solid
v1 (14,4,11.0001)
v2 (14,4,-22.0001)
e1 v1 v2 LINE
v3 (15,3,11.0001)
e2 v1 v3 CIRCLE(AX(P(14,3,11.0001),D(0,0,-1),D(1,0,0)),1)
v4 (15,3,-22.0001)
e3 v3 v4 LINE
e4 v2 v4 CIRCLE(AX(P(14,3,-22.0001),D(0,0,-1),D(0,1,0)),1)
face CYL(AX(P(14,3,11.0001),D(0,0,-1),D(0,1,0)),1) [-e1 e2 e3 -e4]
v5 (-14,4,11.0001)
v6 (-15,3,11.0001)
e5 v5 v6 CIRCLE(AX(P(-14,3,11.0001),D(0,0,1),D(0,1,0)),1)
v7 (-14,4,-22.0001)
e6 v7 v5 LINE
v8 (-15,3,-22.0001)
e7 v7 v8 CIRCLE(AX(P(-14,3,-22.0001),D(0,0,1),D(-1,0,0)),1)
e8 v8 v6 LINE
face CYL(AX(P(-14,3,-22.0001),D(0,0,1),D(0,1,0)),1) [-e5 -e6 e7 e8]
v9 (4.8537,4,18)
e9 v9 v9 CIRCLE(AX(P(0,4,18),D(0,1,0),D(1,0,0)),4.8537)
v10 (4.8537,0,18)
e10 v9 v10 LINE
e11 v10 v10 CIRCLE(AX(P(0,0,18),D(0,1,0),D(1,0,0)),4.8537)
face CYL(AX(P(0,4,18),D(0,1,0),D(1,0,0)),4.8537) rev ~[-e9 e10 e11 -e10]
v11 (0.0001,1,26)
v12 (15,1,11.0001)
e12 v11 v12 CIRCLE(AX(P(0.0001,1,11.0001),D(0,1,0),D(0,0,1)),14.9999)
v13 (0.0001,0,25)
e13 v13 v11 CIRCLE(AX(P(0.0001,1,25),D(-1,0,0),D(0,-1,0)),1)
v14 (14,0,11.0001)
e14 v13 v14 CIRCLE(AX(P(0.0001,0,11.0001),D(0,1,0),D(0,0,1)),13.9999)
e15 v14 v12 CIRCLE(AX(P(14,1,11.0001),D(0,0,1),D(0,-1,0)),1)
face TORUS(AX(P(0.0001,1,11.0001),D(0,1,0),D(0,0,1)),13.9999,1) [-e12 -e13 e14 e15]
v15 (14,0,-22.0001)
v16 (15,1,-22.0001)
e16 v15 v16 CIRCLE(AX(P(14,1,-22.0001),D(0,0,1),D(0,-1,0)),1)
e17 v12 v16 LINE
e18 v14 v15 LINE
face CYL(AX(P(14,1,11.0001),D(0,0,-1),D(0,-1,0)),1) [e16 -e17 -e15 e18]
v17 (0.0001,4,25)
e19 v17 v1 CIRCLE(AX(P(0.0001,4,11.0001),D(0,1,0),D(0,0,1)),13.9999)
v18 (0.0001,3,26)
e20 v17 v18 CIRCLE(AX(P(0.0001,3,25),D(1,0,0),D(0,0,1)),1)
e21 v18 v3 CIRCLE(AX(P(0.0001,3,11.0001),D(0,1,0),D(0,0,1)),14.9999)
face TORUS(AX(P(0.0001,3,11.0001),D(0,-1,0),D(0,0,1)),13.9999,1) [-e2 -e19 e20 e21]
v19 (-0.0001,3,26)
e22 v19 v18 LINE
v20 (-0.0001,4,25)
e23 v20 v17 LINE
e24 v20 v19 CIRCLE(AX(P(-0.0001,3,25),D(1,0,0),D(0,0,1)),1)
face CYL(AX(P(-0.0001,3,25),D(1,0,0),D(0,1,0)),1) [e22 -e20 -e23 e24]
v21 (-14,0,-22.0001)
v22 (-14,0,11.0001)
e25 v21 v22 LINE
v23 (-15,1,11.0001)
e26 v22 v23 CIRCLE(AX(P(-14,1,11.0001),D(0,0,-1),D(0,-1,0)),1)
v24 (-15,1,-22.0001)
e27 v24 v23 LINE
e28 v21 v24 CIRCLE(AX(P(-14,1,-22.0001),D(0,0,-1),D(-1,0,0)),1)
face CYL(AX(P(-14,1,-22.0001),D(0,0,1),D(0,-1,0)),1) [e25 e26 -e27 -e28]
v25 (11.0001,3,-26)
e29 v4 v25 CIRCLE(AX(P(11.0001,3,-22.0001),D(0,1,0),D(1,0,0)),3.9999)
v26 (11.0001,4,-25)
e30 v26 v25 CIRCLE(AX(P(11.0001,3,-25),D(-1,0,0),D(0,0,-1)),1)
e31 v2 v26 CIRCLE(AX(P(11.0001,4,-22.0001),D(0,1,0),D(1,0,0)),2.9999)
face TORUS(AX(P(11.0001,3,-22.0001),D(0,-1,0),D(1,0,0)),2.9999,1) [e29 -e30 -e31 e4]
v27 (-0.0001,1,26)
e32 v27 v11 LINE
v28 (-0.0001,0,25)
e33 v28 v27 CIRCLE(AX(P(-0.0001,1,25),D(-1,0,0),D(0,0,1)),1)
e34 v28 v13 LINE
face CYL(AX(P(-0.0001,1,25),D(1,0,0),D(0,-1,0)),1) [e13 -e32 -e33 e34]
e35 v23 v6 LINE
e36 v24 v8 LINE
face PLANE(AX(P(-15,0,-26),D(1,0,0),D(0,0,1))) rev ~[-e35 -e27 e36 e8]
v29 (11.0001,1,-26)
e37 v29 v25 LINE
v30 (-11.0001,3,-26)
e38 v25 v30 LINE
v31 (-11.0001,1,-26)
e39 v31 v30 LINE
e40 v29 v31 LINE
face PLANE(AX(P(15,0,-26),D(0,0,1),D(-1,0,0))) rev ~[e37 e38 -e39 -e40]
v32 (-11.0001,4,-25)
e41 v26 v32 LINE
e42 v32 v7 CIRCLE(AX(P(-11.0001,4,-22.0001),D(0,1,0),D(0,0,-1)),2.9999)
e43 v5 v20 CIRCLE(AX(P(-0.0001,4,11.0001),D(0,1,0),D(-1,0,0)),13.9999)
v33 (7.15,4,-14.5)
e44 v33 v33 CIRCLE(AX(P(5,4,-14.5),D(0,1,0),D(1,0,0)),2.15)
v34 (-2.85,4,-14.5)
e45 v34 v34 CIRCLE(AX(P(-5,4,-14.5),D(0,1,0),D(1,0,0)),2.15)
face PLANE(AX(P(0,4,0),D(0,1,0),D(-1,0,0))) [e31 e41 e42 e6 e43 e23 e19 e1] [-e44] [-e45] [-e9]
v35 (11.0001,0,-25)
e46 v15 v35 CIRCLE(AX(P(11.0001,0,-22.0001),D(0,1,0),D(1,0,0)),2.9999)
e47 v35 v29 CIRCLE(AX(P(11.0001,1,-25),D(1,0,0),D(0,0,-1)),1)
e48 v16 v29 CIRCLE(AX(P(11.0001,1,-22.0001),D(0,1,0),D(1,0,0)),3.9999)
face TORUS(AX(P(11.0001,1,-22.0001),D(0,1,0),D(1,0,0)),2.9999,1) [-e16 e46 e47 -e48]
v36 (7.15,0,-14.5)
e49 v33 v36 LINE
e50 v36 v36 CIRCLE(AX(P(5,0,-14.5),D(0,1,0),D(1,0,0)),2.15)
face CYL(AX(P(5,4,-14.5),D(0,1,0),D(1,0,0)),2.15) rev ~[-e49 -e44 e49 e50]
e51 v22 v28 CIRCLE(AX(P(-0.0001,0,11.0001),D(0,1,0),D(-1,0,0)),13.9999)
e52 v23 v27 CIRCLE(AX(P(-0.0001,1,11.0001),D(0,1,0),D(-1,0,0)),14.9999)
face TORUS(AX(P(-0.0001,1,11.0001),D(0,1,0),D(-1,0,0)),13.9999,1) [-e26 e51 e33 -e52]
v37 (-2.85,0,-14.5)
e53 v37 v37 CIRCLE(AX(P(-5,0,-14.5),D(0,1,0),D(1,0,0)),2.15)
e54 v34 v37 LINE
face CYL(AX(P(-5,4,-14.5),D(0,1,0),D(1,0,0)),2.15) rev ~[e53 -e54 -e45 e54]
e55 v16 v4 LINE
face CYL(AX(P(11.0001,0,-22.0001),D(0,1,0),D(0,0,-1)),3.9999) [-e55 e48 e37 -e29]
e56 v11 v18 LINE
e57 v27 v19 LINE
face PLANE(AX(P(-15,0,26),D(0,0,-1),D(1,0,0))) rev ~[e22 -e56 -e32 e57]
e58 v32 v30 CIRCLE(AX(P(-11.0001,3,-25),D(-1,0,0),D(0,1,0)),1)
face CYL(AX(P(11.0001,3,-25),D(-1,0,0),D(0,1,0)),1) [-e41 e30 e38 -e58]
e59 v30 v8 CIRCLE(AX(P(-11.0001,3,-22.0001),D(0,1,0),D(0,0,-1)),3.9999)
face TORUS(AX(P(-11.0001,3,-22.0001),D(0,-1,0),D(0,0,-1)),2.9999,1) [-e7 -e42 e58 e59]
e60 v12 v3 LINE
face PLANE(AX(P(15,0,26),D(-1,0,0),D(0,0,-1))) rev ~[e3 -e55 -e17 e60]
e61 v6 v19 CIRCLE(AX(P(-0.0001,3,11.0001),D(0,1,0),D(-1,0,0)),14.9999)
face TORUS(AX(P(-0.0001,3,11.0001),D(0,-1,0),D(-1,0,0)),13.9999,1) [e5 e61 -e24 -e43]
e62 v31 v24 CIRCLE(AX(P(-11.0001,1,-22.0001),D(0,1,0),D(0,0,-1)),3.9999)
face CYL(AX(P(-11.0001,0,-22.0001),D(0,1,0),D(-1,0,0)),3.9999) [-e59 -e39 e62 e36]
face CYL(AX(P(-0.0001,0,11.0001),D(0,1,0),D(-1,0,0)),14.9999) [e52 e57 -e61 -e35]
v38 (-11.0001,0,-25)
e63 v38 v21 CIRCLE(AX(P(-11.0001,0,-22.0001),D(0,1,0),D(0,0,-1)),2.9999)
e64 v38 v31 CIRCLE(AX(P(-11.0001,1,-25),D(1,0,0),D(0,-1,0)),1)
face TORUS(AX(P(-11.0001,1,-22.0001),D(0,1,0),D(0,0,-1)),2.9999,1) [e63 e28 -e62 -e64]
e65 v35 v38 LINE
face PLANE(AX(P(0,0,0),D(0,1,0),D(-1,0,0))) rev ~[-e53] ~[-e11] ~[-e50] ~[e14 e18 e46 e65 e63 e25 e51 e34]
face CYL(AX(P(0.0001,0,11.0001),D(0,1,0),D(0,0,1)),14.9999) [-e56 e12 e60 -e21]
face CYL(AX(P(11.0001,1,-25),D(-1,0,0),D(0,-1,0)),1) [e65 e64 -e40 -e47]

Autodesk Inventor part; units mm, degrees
ref_plane "YZ Plane" through (0, 0, 0) normal (1, 0, 0) x (0, 1, 0)
ref_plane "XZ Plane" through (0, 0, 0) normal (0, 1, 0) x (-1, 0, 0)
sketch "Sketch2" plane through (0, 0, 0) normal (0, 1, 0) x (-1, 0, 0)
  line L0 (15, 26) -> (-15, 26)
  line L1 (-15, 26) -> (-15, -26)
  line L2 (-15, -26) -> (15, -26)
  line L3 (15, -26) -> (15, 26)
  line L4 (0, 0) -> (0, -26) construction
  line L5 (0, 0) -> (0, 26) construction
  line L6 (0, 0) -> (15, 0) construction
  line L7 (0, 0) -> (-15, 0) construction
  dimension "d45" = 30
  dimension "d46" = 52
extrude "Main Body Sketch" add sketch "Sketch2" along normal blind 4
ref_plane "Work Plane1" through (0, 4, 0) normal (0, 1, 0) x (1, 0, 0)
sketch "Sketch4" plane through (0, 4, 0) normal (0, 1, 0) x (1, 0, 0)
  circle A0 centre (0, -18) radius 4.8537
  line L0 (15, 26) -> (-15, 26) projected
  line L1 (-15, 26) -> (-15, -26) projected
  circle A1 centre (5, 14.5) radius 2.15
  circle A2 centre (-5, 14.5) radius 2.15
  line L2 (15, -26) -> (15, 26) projected
  dimension "d84" = 44
  dimension "d85" = 30
  dimension "d86" = 15
  dimension "d87" = 4.3
  dimension "d88" = 4.3
  dimension "d89" = 10
  dimension "d90" = 10
  dimension "d91" = 11.5
  dimension "d92" = 11.5
extrude "Holes Cuts" cut sketch "Sketch4" against normal up to surface (4 mm away)
fillet "Fillet12" radius 4 2 edges at (-15, 2, -26) (15, 2, -26)
fillet "Fillet12" radius 15 2 edges at (15, 2, 26) (-15, 2, 26)
fillet "Fillet13" radius 1 12 edges at (10.6066, 4, 21.6066) (15, 4, -5.5) (13.8285, 4, -24.8285) (0, 4, -26) (-13.8285, 4, -24.8285) (-15, 4, -5.5) (15, 0, -5.5) (13.8285, 0, -24.8285) (0, 0, -26) (-13.8285, 0, -24.8285) (-15, 0, -5.5) (10.6066, 0, 21.6066)
equation "\"d46\" = AH"
equation "\"AH\" = 52"
equation "\"d57\" = TMROL"
equation "\"BD\" = 4"
equation "\"TMROL\" = 45"
properties part number "Side Attatchment"
